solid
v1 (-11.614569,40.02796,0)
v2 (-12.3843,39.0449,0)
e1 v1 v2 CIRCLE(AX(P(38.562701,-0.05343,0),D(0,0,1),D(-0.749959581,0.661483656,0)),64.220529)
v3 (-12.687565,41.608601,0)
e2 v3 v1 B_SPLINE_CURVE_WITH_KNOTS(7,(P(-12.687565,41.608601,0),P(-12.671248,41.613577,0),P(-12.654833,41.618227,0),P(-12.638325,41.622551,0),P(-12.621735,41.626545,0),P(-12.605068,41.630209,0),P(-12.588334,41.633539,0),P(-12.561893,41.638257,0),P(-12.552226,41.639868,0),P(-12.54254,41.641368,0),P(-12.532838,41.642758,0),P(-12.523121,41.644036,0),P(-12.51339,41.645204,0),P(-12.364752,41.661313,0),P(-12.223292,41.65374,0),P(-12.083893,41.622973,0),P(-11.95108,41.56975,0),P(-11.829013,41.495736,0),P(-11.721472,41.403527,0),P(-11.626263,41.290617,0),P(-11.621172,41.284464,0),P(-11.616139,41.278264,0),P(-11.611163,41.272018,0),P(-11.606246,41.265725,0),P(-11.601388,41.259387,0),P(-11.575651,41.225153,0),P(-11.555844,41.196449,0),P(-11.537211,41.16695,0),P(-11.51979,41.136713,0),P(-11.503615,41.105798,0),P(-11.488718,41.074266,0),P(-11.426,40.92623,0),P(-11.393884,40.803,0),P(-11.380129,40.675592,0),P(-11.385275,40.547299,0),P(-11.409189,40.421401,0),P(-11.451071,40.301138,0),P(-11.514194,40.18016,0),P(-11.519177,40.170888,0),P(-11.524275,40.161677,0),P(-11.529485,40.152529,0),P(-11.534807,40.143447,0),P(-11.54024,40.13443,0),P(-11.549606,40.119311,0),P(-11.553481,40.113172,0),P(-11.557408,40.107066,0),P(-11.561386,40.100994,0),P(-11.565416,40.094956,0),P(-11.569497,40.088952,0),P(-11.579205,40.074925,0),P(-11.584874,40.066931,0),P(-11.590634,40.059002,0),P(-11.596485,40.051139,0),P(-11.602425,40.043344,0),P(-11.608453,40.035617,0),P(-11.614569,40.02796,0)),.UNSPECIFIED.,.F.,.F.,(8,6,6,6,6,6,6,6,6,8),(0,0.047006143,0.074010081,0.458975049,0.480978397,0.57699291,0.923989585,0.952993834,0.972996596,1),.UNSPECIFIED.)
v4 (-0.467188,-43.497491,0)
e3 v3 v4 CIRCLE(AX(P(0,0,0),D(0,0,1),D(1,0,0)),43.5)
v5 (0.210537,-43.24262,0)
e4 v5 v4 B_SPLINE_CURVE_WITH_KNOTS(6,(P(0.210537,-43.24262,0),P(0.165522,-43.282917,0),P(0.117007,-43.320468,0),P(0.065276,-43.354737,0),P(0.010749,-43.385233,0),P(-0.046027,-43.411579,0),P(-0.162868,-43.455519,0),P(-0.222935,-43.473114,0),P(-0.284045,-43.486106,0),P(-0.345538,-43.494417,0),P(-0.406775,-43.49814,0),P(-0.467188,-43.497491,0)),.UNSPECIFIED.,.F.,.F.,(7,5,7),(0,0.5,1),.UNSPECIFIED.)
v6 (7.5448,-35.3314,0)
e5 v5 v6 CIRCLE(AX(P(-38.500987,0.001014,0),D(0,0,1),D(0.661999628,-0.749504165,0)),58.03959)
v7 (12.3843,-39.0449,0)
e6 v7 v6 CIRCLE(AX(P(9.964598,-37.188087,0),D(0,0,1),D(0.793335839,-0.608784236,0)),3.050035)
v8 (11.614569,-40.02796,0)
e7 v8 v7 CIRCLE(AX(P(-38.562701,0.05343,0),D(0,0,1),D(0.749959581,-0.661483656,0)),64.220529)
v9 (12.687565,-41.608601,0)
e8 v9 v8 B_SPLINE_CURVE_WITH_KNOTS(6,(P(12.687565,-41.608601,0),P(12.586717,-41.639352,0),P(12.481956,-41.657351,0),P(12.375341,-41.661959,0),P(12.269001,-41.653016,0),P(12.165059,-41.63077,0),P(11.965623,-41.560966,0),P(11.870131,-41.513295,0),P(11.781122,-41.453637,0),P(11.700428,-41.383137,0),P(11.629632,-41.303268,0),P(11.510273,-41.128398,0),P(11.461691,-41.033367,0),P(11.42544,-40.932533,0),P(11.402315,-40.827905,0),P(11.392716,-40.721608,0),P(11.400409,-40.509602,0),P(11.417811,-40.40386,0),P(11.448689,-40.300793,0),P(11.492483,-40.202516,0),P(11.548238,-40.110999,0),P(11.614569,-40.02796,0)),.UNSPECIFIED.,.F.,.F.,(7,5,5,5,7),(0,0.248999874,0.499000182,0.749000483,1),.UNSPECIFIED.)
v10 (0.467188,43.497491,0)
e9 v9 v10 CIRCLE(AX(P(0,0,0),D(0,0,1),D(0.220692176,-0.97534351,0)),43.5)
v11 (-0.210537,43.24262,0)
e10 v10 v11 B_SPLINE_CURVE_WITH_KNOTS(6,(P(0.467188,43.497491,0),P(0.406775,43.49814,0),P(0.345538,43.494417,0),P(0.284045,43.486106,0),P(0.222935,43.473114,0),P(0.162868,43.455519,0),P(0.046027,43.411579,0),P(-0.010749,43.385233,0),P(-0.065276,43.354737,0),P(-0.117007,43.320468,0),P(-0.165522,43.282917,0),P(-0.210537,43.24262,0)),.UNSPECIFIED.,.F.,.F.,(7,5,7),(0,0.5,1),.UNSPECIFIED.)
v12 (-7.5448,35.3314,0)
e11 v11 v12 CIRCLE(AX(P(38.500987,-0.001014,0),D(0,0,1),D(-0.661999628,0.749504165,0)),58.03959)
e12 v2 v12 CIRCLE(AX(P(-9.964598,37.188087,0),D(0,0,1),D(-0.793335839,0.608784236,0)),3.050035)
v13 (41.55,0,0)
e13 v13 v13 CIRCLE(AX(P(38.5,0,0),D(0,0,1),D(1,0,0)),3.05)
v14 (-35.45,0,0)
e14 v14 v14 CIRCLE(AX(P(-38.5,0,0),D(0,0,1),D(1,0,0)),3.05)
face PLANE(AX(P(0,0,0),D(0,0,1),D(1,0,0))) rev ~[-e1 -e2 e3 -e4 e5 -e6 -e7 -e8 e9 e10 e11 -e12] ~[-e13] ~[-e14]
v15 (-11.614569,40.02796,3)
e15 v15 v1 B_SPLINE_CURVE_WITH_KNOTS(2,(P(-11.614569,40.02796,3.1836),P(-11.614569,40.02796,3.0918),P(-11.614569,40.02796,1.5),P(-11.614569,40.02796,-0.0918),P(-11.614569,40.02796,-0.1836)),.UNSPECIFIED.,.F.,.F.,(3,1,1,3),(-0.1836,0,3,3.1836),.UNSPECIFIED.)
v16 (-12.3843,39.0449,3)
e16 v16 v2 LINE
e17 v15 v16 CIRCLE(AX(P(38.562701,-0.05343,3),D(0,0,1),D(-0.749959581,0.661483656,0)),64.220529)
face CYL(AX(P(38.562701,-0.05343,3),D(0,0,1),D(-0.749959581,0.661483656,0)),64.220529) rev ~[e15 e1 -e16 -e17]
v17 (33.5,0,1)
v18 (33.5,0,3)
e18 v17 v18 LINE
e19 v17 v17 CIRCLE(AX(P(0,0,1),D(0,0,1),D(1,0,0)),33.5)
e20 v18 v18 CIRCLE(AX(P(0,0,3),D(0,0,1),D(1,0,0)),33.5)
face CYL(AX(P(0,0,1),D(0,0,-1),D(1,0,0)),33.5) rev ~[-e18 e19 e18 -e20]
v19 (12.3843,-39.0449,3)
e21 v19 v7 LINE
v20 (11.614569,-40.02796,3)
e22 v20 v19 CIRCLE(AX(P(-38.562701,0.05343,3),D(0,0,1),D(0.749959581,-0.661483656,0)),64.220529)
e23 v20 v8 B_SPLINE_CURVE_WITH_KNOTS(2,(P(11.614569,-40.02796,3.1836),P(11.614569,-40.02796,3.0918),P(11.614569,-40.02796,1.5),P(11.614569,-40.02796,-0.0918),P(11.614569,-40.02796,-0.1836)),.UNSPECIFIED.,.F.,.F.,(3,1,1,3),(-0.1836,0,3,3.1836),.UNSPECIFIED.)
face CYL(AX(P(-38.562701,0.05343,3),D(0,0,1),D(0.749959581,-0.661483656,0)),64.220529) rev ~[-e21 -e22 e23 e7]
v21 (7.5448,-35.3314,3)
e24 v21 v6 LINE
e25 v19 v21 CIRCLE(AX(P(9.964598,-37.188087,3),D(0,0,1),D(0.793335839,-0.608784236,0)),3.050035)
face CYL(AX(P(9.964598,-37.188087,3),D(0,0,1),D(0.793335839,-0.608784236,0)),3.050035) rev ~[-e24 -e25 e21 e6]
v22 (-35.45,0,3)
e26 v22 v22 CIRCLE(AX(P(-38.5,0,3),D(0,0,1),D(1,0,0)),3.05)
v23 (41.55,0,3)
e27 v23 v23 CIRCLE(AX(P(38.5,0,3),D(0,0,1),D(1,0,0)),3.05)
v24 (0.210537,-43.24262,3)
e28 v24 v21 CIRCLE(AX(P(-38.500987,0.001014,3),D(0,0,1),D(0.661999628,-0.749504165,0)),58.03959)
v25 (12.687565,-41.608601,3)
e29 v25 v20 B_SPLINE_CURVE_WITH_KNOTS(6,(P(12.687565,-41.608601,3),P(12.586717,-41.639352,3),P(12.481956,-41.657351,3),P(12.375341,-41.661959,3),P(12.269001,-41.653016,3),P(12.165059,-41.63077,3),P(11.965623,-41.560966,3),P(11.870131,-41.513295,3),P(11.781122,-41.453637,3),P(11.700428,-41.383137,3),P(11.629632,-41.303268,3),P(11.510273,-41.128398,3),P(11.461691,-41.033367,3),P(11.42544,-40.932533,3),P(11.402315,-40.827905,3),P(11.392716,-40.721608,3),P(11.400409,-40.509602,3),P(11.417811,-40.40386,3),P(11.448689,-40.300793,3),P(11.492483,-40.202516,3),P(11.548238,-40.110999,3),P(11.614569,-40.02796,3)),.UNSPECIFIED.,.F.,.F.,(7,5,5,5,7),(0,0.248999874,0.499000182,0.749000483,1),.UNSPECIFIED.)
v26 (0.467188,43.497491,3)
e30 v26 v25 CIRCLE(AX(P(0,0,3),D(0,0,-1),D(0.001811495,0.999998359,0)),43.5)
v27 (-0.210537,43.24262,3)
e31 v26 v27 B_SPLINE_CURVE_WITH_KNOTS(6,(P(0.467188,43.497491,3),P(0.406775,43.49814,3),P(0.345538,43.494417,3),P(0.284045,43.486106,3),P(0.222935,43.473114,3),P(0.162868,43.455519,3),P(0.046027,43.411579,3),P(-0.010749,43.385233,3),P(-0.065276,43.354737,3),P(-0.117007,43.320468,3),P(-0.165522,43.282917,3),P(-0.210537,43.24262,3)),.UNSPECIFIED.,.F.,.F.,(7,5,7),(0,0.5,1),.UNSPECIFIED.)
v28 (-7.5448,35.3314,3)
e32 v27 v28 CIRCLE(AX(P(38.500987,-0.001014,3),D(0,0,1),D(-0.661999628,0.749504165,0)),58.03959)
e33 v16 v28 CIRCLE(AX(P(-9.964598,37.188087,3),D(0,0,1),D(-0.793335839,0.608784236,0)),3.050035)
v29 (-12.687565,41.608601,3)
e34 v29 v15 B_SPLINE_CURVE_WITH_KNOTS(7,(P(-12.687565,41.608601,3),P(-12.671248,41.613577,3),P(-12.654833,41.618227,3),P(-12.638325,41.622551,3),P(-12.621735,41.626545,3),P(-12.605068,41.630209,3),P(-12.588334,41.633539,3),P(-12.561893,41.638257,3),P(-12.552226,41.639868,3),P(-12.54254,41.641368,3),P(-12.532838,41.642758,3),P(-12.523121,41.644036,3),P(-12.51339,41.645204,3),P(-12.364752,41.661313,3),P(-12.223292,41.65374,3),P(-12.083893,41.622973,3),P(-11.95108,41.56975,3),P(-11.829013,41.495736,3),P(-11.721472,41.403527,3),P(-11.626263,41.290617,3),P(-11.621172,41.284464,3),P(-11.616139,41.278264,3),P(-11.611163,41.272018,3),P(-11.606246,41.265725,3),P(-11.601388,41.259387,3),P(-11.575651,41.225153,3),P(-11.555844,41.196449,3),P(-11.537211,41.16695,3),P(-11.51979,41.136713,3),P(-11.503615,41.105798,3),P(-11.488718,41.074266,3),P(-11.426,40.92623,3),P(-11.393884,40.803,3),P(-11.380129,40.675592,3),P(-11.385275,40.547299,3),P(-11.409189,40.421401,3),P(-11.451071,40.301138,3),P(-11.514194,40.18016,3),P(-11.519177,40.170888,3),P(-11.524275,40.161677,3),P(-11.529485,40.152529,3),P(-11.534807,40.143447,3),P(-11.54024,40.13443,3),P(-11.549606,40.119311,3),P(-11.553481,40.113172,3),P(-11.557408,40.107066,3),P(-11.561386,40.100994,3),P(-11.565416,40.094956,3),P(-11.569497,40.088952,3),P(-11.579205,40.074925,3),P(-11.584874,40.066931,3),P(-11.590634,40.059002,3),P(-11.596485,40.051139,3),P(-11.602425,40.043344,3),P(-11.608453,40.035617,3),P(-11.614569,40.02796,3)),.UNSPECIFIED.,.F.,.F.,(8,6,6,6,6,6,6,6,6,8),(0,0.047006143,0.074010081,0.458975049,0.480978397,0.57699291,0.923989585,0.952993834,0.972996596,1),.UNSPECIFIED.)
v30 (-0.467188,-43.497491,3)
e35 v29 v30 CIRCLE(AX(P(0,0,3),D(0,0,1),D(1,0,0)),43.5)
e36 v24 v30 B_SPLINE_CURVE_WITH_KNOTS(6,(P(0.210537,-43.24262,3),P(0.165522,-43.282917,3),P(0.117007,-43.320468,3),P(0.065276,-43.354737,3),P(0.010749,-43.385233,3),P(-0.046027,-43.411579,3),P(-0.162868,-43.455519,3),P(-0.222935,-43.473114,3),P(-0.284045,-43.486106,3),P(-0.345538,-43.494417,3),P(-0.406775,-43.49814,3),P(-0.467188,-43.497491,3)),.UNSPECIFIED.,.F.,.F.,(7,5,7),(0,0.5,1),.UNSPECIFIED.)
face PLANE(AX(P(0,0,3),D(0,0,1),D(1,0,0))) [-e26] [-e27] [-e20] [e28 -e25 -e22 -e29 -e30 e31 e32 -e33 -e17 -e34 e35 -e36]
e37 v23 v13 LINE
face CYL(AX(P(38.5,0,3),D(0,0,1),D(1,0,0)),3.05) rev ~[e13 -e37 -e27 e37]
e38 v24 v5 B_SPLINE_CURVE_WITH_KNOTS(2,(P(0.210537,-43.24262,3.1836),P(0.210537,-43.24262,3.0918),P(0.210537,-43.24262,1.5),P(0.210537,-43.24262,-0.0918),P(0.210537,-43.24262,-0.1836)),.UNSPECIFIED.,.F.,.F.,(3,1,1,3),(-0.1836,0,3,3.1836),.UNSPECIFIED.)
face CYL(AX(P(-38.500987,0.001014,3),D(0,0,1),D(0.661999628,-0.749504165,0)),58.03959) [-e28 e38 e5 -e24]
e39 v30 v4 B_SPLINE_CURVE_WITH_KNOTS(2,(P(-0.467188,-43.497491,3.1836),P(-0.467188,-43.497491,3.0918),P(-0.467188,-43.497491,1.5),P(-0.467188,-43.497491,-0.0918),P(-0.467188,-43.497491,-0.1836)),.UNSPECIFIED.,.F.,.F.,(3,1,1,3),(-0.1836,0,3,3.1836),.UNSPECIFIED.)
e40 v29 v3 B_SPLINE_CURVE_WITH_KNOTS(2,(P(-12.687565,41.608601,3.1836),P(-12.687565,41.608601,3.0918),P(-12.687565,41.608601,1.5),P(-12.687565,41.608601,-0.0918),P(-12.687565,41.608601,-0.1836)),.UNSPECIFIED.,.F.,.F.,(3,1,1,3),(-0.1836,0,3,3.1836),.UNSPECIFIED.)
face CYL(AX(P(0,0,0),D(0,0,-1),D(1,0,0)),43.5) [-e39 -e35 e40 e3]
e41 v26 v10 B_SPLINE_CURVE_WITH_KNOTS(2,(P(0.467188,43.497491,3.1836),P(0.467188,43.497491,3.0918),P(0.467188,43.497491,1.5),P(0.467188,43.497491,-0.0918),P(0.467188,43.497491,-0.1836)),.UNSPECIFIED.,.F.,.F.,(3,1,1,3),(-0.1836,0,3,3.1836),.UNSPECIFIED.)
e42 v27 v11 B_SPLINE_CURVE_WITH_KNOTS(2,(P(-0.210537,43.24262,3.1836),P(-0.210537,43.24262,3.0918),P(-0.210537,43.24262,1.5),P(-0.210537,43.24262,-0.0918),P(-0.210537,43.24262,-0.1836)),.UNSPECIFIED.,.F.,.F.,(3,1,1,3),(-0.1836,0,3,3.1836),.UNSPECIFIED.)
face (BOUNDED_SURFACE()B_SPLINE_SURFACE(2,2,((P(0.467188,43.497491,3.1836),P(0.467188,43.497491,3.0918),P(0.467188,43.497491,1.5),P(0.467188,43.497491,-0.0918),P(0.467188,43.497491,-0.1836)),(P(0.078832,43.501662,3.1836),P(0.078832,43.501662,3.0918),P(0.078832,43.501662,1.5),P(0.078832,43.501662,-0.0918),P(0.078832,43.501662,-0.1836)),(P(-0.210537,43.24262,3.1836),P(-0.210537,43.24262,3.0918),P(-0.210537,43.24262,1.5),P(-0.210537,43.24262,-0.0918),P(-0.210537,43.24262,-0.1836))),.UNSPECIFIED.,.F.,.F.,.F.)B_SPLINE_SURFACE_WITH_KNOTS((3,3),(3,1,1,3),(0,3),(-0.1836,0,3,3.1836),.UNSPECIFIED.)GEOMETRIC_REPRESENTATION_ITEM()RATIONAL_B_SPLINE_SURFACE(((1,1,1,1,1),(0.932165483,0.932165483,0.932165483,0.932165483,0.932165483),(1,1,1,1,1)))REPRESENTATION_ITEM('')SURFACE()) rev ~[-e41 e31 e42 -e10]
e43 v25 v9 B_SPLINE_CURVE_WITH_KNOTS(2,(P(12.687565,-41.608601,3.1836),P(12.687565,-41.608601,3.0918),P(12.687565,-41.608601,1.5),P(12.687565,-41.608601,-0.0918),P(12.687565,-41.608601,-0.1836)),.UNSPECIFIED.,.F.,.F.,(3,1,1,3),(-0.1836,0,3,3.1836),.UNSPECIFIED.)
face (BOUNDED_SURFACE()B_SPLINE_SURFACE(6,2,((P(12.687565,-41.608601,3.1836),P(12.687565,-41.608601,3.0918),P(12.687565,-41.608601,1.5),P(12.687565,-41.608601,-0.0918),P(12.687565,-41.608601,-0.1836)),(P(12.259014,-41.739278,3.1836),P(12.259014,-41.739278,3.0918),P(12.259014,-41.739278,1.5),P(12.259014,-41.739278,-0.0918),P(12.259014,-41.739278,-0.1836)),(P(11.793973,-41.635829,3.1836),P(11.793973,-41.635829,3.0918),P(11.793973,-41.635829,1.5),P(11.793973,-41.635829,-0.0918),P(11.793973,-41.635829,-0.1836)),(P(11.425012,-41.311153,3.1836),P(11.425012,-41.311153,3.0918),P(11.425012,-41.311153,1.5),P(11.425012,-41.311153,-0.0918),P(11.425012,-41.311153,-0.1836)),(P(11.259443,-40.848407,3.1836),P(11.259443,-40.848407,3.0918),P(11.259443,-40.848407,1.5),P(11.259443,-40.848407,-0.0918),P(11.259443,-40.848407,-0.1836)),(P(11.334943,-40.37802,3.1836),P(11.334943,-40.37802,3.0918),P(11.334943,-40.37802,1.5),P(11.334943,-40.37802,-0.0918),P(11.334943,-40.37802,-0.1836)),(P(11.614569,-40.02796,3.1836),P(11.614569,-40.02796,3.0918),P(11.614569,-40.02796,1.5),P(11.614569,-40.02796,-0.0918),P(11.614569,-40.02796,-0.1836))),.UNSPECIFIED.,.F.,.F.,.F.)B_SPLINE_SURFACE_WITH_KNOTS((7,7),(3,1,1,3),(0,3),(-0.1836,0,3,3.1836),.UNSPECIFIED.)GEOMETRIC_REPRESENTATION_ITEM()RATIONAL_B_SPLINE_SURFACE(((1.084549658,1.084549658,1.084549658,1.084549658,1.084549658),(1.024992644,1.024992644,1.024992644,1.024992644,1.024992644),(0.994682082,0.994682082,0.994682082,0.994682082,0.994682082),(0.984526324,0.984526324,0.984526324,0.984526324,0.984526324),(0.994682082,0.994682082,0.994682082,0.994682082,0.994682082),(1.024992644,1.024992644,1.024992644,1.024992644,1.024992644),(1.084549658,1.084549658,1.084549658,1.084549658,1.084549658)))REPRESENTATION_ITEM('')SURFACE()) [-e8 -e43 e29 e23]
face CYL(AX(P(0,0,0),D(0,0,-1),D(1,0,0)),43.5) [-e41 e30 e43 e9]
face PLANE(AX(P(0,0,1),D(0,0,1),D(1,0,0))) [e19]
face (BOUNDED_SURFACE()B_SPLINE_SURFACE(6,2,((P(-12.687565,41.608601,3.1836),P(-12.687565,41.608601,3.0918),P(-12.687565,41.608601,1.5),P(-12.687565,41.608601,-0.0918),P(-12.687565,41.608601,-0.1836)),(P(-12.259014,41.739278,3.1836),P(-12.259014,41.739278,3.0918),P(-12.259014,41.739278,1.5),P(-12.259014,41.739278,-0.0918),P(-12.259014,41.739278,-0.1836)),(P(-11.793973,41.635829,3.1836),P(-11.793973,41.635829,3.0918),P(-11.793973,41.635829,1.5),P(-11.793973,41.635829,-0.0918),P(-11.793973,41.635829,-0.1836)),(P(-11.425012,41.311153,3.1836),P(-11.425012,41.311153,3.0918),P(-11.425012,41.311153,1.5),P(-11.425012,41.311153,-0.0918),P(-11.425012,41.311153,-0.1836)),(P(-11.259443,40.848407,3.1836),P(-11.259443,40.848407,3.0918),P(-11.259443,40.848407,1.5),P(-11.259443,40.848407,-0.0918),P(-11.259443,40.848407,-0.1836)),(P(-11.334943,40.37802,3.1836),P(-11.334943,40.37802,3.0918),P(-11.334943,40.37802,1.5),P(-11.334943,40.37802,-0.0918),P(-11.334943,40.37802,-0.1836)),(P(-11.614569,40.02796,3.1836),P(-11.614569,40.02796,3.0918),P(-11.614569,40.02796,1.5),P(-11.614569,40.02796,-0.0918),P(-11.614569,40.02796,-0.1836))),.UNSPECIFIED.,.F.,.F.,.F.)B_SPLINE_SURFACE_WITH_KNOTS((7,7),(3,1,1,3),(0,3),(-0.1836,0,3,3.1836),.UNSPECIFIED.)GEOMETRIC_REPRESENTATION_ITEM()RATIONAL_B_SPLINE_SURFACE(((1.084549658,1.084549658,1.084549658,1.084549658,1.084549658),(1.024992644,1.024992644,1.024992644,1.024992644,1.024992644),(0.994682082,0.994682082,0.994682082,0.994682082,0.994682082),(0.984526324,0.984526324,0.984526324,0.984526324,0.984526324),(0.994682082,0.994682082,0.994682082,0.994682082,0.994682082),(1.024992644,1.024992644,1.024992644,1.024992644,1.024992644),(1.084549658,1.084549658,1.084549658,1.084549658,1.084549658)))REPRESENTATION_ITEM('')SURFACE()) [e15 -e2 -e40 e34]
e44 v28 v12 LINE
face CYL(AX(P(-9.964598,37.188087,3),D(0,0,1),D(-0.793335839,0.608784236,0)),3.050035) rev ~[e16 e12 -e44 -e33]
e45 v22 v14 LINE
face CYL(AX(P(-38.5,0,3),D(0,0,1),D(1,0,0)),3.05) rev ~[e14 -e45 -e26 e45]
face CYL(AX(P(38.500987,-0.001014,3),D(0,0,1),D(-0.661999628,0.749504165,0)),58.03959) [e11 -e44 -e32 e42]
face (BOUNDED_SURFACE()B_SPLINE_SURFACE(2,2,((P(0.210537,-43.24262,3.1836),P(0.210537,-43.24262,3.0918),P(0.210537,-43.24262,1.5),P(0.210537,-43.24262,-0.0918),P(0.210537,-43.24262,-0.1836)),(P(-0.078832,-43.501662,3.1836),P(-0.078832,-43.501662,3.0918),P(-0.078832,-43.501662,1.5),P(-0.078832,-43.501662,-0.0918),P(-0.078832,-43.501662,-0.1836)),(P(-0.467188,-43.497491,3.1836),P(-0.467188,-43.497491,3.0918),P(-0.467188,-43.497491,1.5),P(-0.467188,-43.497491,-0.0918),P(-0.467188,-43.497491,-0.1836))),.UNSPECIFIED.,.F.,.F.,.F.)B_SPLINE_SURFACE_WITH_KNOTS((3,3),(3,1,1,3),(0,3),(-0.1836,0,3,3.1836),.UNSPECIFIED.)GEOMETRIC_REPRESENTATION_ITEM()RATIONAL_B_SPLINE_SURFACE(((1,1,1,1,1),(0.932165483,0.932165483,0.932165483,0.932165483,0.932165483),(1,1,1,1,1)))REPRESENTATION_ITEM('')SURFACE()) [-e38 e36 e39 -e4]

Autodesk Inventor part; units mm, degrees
ref_plane "YZ Plane" through (0, 0, 0) normal (1, 0, 0) x (0, 1, 0)
ref_plane "XZ Plane" through (0, 0, 0) normal (0, 1, 0) x (-1, 0, 0)
ref_plane "XY Plane" through (0, 0, 0) normal (0, 0, 1) x (1, 0, 0)
sketch "スケッチ1" plane through (0, 0, 0) normal (0, 0, 1) x (1, 0, 0)
  circle A0 centre (0, 0) radius 33.5 construction
  circle A1 centre (0, 0) radius 43.5
  dimension "d0" = 67
  dimension "d1" = 87
extrude "押し出し1" add sketch "スケッチ1" along normal blind 1
sketch "スケッチ2" plane through (0, 0, 1) normal (0, 0, 1) x (1, 0, 0)
  circle A0 centre (0, 0) radius 33.5
  circle A1 centre (0, 0) radius 43.5 projected
  dimension "d4" = 67
extrude "押し出し2" add sketch "スケッチ2" along normal blind 2
sketch "スケッチ4" plane through (0, 0, 3) normal (0, 0, 1) x (1, 0, 0)
  circle A0 centre (0, 0) radius 33.5 construction
  circle A1 centre (0, 0) radius 43.5 construction
  line L0 (0, 0) -> (33.5, 0) construction
  line L1 (33.5, 0) -> (43.5, 0) construction
  circle A2 centre (0, 0) radius 33.5 construction
  line L2 (0, 0) -> (-33.5, 0) construction
  circle A3 centre (0, 0) radius 43.5 construction
  line L3 (-43.5, 0) -> (-33.5, 0) construction
  circle A4 centre (38.5, 0) radius 3.05
  circle A5 centre (-38.5, 0) radius 3.05
  circle A6 centre (0, 0) radius 38.5 construction
  circle A7 centre (-9.9645, 37.1881) radius 3.05 construction
  arc A8 (-3.4944, 44.3648) -> (-9.9645, 37.1881) centre (38.5, 0) ccw construction
  line L4 (38.5, 0) -> (-9.9645, 37.1881) construction
  line L5 (-9.9645, 37.1881) -> (-12.3843, 39.0449) construction
  arc A9 (0.0788, 43.4999) -> (-7.5448, 35.3314) centre (38.5, 0) ccw
  arc A10 (-9.6001, 42.4274) -> (-12.3843, 39.0449) centre (38.5, 0) ccw
  arc A11 (-12.3843, 39.0449) -> (-7.5448, 35.3314) centre (-9.9645, 37.1881) ccw
  arc A12 (0.0788, 43.4999) -> (-9.6001, 42.4274) centre (0, 0) ccw
  circle A13 centre (9.9645, -37.1881) radius 3.05 construction
  line L6 (-38.5, 0) -> (9.9645, -37.1881) construction
  line L7 (9.9645, -37.1881) -> (12.3843, -39.0449) construction
  arc A14 (-0.0788, -43.4999) -> (7.5448, -35.3314) centre (-38.5, 0) ccw
  arc A15 (9.6001, -42.4274) -> (12.3843, -39.0449) centre (-38.5, 0) ccw
  arc A16 (12.3843, -39.0449) -> (7.5448, -35.3314) centre (9.9645, -37.1881) ccw
  arc A17 (-0.0788, -43.4999) -> (9.6001, -42.4274) centre (0, 0) ccw
  line L8 (-9.9645, 37.1881) -> (9.9645, -37.1881) construction
  dimension "d7" = 6.1
  dimension "d8" = 3.05
  dimension "d15" = 105
extrude "押し出し3" cut sketch "スケッチ4" against normal through all
fillet "フィレット1" radius 1 4 edges at (-9.6001, 42.4274, 1.5) (0.0788, 43.4999, 1.5) (-0.0788, -43.4999, 1.5) (9.6001, -42.4274, 1.5)
properties part number "kanure_01"
